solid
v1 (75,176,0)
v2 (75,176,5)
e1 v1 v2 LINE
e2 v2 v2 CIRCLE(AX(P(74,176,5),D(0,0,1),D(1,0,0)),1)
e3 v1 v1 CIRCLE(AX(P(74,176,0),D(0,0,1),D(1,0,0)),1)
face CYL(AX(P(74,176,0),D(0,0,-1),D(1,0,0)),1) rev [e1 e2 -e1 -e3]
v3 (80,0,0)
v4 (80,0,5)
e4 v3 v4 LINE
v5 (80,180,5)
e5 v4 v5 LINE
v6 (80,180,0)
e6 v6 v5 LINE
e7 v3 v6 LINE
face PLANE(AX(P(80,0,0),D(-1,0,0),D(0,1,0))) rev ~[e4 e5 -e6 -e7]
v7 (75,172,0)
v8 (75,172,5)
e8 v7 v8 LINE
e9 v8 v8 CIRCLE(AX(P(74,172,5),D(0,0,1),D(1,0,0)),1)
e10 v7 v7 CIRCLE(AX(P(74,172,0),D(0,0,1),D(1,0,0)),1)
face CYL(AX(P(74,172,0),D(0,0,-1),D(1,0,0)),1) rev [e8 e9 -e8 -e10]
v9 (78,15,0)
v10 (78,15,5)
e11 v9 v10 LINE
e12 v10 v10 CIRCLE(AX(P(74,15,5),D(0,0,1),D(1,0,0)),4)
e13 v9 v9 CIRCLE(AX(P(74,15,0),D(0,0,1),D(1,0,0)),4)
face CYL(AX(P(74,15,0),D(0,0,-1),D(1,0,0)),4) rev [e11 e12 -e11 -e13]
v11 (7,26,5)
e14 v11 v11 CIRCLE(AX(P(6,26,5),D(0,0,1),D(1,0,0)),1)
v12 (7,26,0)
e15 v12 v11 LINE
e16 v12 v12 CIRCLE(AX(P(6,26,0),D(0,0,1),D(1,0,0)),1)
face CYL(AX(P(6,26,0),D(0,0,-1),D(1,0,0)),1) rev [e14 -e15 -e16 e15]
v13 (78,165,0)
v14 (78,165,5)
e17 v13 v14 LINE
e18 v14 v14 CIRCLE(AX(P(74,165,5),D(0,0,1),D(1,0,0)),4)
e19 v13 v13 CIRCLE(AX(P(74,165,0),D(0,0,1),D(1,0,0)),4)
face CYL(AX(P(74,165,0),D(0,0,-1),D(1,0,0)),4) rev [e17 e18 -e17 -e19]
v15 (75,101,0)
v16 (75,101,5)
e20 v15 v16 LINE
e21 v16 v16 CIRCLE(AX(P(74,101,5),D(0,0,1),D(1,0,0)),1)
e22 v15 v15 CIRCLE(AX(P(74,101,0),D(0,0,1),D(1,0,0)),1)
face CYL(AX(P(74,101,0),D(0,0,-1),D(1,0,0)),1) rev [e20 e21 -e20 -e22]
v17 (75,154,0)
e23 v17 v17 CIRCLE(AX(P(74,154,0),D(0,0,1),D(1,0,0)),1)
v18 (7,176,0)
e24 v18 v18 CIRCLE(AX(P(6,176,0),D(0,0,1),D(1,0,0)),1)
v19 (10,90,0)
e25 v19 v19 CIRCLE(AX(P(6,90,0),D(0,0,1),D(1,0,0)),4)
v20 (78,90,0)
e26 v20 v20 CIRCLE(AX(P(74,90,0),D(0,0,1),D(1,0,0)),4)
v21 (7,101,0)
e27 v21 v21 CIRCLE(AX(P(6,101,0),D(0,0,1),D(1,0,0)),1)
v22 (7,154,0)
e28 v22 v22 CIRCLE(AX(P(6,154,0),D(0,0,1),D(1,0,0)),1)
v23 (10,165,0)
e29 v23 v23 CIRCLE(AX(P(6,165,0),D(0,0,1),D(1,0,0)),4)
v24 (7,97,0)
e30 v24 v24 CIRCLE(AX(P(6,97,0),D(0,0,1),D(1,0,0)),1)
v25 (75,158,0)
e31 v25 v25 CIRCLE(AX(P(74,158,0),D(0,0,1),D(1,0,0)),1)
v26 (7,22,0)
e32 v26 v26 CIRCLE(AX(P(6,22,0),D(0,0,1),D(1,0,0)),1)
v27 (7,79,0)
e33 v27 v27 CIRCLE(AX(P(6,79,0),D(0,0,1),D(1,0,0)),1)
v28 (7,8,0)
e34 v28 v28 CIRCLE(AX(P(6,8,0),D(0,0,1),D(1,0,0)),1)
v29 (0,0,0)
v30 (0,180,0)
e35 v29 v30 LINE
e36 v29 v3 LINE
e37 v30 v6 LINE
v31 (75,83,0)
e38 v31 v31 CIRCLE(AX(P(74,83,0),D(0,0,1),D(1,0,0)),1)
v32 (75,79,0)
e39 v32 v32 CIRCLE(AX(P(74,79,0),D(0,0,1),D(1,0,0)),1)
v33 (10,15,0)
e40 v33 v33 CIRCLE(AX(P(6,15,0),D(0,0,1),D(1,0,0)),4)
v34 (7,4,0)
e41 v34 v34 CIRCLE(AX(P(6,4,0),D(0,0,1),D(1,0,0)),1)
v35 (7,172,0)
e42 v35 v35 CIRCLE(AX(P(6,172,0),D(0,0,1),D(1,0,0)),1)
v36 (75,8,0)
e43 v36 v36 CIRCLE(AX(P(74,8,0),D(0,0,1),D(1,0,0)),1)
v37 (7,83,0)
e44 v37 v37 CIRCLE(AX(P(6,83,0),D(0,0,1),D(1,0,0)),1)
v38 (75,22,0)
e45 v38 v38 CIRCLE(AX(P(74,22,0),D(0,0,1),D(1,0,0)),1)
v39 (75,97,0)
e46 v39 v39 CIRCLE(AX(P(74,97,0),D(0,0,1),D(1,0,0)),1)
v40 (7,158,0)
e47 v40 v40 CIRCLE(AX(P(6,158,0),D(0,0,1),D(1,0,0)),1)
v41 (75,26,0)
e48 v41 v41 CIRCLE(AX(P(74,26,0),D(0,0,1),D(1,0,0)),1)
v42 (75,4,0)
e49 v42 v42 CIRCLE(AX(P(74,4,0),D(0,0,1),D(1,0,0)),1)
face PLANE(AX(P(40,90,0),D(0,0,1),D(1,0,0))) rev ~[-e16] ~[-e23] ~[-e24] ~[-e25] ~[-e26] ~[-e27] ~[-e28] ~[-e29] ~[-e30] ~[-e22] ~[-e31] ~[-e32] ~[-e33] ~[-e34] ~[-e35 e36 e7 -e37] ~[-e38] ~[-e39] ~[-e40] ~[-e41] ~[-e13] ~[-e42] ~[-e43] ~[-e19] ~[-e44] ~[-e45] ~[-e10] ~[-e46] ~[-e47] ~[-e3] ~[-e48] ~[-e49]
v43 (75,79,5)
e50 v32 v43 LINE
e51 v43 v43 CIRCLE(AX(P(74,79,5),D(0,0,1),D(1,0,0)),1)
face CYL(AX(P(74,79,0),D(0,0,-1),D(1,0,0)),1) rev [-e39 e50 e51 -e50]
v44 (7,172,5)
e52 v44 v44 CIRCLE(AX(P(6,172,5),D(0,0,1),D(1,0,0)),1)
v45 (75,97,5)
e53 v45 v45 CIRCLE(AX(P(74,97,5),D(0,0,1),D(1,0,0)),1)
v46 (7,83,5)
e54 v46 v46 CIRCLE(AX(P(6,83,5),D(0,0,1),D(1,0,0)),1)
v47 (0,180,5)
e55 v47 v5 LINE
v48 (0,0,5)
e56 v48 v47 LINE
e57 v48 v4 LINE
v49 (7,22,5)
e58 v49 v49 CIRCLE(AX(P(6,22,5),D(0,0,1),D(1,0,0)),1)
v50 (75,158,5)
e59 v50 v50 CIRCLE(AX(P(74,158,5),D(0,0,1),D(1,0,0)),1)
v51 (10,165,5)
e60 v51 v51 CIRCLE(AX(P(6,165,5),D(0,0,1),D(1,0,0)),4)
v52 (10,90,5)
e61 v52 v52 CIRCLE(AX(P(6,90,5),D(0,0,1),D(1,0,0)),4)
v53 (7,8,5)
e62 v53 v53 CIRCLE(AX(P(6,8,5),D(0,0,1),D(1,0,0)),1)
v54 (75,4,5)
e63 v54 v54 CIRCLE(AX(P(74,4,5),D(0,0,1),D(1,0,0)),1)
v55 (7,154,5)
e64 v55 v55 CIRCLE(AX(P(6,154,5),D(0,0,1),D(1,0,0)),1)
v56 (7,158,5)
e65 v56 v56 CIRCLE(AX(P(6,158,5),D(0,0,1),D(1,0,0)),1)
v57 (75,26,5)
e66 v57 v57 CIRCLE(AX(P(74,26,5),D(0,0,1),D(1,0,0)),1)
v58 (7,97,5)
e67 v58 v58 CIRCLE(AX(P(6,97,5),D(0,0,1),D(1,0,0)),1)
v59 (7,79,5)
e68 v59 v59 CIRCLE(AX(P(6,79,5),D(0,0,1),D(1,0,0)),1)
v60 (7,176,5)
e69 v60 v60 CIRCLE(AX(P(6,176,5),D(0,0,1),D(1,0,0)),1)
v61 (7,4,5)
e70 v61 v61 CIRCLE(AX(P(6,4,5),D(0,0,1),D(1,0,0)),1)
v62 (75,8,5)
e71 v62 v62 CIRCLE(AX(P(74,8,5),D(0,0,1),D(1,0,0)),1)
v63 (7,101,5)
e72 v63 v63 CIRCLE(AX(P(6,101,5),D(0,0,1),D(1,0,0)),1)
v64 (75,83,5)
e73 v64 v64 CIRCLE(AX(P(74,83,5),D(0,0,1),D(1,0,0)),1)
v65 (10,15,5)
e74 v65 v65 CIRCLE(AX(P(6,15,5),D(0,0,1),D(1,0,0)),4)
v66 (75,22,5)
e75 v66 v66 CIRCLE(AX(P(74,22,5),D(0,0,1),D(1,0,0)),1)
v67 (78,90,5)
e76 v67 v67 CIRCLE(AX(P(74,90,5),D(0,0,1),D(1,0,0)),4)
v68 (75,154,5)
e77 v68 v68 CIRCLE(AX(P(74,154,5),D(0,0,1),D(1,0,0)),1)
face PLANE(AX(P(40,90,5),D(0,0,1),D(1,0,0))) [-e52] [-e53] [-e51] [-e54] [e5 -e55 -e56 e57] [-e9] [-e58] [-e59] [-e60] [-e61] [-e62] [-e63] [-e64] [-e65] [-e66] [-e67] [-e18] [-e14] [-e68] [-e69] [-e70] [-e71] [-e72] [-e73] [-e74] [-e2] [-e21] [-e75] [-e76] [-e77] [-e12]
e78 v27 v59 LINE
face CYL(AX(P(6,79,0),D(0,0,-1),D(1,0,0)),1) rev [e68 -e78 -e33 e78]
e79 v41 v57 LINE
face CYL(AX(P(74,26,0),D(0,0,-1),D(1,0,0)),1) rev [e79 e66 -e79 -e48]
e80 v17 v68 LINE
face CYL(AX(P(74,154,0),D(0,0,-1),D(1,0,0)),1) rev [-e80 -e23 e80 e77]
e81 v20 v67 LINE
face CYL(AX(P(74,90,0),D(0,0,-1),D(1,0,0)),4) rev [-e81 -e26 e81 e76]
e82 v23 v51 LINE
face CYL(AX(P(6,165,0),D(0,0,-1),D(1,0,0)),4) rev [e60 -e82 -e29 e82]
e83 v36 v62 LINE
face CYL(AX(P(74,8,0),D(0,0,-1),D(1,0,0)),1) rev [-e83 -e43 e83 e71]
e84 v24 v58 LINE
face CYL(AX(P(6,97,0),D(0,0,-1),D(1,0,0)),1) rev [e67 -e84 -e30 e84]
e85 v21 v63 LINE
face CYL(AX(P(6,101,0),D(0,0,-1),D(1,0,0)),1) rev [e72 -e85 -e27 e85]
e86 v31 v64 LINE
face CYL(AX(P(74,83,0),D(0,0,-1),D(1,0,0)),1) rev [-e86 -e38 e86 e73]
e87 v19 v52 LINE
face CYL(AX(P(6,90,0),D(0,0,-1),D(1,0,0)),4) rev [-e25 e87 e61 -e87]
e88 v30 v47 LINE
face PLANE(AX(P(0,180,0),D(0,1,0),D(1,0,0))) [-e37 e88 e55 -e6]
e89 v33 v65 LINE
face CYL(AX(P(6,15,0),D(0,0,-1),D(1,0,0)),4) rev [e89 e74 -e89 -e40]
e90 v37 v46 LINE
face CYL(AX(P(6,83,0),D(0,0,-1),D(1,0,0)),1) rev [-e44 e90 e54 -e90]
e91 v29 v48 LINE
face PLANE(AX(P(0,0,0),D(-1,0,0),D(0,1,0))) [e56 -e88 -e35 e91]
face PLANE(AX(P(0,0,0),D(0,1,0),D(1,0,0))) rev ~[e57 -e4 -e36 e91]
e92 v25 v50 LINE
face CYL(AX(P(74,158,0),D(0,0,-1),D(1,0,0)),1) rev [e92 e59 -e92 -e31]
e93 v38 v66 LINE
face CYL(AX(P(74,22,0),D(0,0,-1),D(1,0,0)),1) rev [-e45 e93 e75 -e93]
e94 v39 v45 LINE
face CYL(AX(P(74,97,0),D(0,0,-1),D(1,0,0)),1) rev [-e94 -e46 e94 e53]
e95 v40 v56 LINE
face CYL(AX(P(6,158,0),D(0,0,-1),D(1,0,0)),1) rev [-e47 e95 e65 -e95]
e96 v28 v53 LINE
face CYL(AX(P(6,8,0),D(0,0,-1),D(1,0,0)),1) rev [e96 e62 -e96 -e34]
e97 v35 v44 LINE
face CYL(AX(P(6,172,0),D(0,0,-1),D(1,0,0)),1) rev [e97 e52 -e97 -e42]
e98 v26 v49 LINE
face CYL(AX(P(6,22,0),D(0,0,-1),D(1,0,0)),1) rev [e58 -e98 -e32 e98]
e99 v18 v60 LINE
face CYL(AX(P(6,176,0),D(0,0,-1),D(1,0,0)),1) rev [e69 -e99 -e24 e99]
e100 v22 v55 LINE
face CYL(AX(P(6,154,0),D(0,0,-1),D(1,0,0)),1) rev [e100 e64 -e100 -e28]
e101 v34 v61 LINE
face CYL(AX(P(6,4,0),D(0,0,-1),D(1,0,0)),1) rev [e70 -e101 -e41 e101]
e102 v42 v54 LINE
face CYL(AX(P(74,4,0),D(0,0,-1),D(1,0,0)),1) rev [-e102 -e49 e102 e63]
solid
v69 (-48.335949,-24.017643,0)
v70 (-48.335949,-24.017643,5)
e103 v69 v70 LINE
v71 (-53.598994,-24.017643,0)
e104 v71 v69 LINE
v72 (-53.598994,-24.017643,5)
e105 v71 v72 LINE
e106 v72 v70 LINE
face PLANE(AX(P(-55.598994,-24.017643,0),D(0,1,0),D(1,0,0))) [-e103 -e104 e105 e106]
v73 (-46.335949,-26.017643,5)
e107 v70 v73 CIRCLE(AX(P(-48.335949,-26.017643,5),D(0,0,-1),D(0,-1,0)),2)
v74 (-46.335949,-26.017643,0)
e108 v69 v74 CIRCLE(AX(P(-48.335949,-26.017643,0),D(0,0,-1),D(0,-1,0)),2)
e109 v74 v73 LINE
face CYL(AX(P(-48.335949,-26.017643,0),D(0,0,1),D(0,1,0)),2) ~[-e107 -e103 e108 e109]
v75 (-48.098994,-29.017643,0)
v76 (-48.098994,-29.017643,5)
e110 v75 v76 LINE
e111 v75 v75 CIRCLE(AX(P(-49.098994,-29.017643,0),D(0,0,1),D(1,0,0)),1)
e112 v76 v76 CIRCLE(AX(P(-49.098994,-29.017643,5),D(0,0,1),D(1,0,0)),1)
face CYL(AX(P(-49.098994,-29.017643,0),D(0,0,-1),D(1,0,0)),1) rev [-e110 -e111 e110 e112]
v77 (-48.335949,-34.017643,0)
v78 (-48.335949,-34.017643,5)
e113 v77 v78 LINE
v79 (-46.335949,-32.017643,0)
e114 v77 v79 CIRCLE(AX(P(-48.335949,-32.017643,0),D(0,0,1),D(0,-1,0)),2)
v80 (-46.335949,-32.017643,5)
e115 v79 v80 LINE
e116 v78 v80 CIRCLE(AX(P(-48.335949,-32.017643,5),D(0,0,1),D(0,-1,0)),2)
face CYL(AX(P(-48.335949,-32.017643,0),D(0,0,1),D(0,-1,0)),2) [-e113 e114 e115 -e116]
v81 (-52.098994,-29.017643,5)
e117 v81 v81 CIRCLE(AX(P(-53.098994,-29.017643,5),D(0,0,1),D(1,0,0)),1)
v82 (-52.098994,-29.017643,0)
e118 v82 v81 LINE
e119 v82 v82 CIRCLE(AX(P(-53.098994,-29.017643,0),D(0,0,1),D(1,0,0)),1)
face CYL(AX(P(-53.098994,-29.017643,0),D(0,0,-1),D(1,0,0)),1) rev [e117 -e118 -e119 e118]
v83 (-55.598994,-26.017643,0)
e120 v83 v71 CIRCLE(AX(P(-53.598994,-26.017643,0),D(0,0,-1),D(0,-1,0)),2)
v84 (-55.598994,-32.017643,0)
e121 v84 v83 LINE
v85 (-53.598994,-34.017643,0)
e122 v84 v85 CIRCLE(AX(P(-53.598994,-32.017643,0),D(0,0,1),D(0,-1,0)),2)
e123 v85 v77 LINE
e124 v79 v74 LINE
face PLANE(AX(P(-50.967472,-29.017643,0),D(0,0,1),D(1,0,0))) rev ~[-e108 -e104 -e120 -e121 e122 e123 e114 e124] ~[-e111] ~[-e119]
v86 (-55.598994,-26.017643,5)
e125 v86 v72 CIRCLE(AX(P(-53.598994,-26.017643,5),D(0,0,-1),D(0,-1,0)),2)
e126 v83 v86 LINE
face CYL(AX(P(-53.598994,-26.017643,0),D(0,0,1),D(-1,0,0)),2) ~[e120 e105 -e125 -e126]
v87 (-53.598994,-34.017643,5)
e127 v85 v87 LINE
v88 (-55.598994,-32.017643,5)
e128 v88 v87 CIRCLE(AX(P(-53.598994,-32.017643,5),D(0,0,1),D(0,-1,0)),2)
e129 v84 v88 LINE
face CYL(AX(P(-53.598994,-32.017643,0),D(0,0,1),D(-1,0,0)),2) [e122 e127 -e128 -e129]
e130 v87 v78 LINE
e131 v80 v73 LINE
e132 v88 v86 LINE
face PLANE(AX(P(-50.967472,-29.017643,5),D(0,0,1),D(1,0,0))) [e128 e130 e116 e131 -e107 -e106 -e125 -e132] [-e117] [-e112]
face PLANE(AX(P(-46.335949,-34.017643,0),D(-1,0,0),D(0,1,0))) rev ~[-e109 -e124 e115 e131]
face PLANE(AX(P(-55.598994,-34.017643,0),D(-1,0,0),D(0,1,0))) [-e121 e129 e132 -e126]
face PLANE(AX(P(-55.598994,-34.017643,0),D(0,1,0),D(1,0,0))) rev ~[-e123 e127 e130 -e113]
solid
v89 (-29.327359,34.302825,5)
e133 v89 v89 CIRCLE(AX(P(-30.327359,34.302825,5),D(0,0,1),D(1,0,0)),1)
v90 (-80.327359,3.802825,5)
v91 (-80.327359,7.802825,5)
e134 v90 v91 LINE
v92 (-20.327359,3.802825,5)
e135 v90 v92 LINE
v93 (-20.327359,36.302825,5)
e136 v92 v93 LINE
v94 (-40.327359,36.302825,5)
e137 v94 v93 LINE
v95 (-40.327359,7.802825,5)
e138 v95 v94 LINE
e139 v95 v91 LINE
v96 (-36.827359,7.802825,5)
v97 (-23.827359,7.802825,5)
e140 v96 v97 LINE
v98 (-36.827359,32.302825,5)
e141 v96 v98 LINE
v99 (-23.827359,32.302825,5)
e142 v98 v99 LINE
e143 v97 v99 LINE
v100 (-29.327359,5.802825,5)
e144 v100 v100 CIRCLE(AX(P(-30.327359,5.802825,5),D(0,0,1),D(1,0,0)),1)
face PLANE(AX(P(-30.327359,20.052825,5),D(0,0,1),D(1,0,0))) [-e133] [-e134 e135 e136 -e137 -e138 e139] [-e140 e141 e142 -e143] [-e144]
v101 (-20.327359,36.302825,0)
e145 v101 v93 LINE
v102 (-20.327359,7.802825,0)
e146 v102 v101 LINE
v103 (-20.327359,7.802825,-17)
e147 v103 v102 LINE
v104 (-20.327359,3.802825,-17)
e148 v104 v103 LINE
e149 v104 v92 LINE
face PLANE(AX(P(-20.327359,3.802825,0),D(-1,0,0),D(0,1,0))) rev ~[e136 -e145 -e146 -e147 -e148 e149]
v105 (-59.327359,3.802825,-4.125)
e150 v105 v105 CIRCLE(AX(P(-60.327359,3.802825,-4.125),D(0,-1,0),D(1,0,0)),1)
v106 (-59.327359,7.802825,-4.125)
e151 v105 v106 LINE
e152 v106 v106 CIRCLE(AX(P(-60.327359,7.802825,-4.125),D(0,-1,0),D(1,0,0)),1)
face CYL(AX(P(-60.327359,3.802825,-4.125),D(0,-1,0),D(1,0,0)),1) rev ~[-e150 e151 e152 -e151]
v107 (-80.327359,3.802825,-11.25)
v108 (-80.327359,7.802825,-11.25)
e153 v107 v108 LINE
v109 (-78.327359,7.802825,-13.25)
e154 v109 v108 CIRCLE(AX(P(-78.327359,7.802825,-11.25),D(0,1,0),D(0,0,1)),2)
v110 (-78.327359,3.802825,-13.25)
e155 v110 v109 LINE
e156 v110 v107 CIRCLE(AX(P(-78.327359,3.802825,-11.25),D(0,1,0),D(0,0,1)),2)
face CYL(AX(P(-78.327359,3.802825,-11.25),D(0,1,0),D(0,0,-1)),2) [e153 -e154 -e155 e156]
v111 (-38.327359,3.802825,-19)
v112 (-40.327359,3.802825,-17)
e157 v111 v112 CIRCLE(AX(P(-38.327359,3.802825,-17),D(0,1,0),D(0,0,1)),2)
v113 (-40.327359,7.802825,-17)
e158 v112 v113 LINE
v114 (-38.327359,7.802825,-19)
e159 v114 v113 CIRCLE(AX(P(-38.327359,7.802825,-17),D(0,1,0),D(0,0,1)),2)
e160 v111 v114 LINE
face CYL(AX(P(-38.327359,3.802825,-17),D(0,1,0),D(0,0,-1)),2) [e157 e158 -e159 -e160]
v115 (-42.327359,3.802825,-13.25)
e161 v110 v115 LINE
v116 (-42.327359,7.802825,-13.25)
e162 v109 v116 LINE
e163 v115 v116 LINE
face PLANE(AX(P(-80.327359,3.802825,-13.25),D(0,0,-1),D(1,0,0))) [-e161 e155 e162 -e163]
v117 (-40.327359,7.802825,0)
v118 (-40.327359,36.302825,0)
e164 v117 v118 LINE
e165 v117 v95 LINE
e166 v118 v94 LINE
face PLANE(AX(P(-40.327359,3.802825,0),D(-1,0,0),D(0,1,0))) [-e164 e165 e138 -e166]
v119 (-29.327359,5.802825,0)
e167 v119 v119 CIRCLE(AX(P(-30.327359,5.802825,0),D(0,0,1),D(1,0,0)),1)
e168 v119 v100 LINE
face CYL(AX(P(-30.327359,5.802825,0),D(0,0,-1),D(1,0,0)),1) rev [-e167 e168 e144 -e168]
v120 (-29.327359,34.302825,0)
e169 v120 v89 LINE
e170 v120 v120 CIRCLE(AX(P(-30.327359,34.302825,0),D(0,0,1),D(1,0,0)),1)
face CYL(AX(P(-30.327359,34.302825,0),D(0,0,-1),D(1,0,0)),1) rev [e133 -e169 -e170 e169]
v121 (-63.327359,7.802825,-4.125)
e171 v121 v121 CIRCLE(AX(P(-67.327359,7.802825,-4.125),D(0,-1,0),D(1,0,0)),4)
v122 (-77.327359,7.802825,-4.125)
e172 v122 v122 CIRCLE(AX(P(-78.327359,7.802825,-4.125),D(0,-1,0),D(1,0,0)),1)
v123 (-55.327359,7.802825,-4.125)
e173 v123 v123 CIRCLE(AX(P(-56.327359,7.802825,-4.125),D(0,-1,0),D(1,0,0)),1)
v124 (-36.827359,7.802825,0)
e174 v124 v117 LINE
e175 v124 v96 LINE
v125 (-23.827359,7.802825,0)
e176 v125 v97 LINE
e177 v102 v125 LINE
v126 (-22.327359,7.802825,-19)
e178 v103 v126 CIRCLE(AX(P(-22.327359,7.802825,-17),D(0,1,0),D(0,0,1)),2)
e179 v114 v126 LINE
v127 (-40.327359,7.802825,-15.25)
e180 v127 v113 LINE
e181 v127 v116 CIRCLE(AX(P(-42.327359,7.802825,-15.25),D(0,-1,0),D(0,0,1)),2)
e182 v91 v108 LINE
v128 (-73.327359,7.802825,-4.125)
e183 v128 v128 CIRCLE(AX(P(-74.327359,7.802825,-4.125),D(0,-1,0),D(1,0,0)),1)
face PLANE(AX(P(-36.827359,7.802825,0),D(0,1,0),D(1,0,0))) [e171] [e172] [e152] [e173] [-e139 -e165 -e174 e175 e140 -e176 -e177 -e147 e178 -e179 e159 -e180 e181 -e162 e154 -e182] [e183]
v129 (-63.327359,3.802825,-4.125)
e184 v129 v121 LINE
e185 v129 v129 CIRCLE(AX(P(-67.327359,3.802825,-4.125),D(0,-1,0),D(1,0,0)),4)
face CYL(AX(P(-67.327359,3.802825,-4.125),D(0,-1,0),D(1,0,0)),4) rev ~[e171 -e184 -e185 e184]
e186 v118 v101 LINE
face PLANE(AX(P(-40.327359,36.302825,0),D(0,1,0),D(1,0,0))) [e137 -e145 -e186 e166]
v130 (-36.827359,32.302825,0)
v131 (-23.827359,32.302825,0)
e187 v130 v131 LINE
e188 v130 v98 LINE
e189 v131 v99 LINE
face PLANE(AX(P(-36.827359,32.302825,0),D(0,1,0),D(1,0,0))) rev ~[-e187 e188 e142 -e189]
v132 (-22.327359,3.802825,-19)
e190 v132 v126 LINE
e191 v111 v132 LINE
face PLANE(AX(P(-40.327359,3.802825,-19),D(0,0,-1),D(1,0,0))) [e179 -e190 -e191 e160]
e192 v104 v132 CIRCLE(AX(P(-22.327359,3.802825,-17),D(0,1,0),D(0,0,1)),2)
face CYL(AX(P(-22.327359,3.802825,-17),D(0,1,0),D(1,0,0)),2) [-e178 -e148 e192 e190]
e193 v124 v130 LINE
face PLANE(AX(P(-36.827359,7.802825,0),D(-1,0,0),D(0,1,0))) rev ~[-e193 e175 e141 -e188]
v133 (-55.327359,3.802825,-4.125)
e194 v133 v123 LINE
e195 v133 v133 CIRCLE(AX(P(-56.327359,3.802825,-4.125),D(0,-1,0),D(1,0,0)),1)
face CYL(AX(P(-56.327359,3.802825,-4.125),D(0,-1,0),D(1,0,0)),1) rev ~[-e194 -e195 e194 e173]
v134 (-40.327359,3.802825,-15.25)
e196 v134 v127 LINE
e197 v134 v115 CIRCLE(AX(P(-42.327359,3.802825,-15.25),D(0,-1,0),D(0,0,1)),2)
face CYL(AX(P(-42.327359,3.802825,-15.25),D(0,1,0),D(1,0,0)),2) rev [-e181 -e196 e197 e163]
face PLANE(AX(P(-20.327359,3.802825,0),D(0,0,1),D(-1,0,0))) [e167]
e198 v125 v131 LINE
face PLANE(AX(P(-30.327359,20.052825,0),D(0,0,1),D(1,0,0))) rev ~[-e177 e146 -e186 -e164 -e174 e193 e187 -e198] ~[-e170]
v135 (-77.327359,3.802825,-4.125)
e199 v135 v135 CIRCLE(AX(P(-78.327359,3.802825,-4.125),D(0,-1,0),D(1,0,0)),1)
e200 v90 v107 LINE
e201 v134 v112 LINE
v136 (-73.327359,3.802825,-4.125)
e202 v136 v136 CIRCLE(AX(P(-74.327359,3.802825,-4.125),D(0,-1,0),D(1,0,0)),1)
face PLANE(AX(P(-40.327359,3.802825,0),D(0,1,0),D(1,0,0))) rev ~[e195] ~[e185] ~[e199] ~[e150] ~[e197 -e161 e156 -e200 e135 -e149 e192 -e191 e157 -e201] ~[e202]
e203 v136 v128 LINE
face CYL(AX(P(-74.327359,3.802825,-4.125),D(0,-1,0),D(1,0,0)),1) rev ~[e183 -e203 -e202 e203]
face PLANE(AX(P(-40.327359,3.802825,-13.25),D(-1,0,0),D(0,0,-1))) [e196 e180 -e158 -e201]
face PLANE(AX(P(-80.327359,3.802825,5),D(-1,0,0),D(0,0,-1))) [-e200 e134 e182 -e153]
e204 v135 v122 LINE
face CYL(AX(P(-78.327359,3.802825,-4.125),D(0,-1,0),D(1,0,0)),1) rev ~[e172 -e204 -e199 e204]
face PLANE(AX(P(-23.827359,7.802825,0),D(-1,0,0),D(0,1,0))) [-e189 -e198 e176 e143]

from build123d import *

# Parameters (mm, degrees)
F0_W     = 20
F0_H     = 32.5
F0_R     = 1
F0_W_2   = 13
F0_H_2   = 24.5
F1_DEPTH = 5
F2_R     = 1
F2_R_2   = 4
F3_DEPTH = 4
F4_R     = 2
F5_W     = 9.2630446101
F5_H     = 10
F5_R     = 1
F6_DEPTH = 5
F7_R     = 2
F8_W     = 80
F8_H     = 180
F8_R     = 1
F8_R_2   = 4
F9_DEPTH = 5


with BuildPart() as f1:
    # F0 (on Top) → F1 (new body)
    with BuildSketch(Plane.XY):
        with Locations((-30.3273589909, 20.0528247654)):
            Rectangle(F0_W, F0_H)
        with Locations((-30.3273589909, 5.8028247654)):
            Circle(F0_R, mode=Mode.SUBTRACT)
        with Locations((-30.3273589909, 20.0528247654)):
            Rectangle(F0_W_2, F0_H_2, mode=Mode.SUBTRACT)
        with Locations((-30.3273589909, 34.3028247654)):
            Circle(F0_R, mode=Mode.SUBTRACT)
    extrude(amount=F1_DEPTH)

    # F2 (on face) → F3 (join)
    with BuildSketch(Plane.XZ.offset(-3.8028247654)):
        Polygon((-20.3273589909, 0), (-40.3273589909, 0), (-40.3273589909, 5), (-80.3273589909, 5), (-80.3273589909, -13.25), (-40.3273589909, -13.25), (-40.3273589909, -19), (-20.3273589909, -19), align=None)
        with Locations((-78.3273589909, -4.125)):
            Circle(F2_R, mode=Mode.SUBTRACT)
        with Locations((-74.3273589909, -4.125)):
            Circle(F2_R, mode=Mode.SUBTRACT)
        with Locations((-67.3273589909, -4.125)):
            Circle(F2_R_2, mode=Mode.SUBTRACT)
        with Locations((-60.3273589909, -4.125)):
            Circle(F2_R, mode=Mode.SUBTRACT)
        with Locations((-56.3273589909, -4.125)):
            Circle(F2_R, mode=Mode.SUBTRACT)
    extrude(amount=-F3_DEPTH)

    # F4
    f4_edges = [f1.edges().sort_by_distance(p)[0] for p in [
        (-40.327359, 5.802825, -13.25),
        (-40.327359, 5.802825, -19),
        (-20.327359, 5.802825, -19),
        (-80.327359, 5.802825, -13.25),
    ]]
    fillet(f4_edges, radius=F4_R)


with BuildPart() as f6:
    # F5 (on Top) → F6 (new body)
    with BuildSketch(Plane.XY):
        with Locations((-50.9674716741, -29.0176426284)):
            Rectangle(F5_W, F5_H)
        with Locations((-53.0989939792, -29.0176426284)):
            Circle(F5_R, mode=Mode.SUBTRACT)
        with Locations((-49.0989939792, -29.0176426284)):
            Circle(F5_R, mode=Mode.SUBTRACT)
    extrude(amount=F6_DEPTH)

    # F7
    f7_edges = [f6.edges().sort_by_distance(p)[0] for p in [
        (-55.598994, -24.017643, 2.5),
        (-46.335949, -24.017643, 2.5),
        (-55.598994, -34.017643, 2.5),
        (-46.335949, -34.017643, 2.5),
    ]]
    fillet(f7_edges, radius=F7_R)


with BuildPart() as f9:
    # F8 (on Top) → F9 (new body)
    with BuildSketch(Plane.XY):
        with Locations((40, 90)):
            Rectangle(F8_W, F8_H)
        with Locations((6, 4)):
            Circle(F8_R, mode=Mode.SUBTRACT)
        with Locations((6, 8)):
            Circle(F8_R, mode=Mode.SUBTRACT)
        with Locations((6, 15)):
            Circle(F8_R_2, mode=Mode.SUBTRACT)
        with Locations((6, 22)):
            Circle(F8_R, mode=Mode.SUBTRACT)
        with Locations((6, 26)):
            Circle(F8_R, mode=Mode.SUBTRACT)
        with Locations((6, 79)):
            Circle(F8_R, mode=Mode.SUBTRACT)
        with Locations((6, 83)):
            Circle(F8_R, mode=Mode.SUBTRACT)
        with Locations((74, 4)):
            Circle(F8_R, mode=Mode.SUBTRACT)
        with Locations((74, 8)):
            Circle(F8_R, mode=Mode.SUBTRACT)
        with Locations((74, 15)):
            Circle(F8_R_2, mode=Mode.SUBTRACT)
        with Locations((74, 22)):
            Circle(F8_R, mode=Mode.SUBTRACT)
        with Locations((74, 26)):
            Circle(F8_R, mode=Mode.SUBTRACT)
        with Locations((74, 79)):
            Circle(F8_R, mode=Mode.SUBTRACT)
        with Locations((74, 83)):
            Circle(F8_R, mode=Mode.SUBTRACT)
        with Locations((6, 90)):
            Circle(F8_R_2, mode=Mode.SUBTRACT)
        with Locations((6, 97)):
            Circle(F8_R, mode=Mode.SUBTRACT)
        with Locations((6, 101)):
            Circle(F8_R, mode=Mode.SUBTRACT)
        with Locations((6, 154)):
            Circle(F8_R, mode=Mode.SUBTRACT)
        with Locations((6, 158)):
            Circle(F8_R, mode=Mode.SUBTRACT)
        with Locations((6, 165)):
            Circle(F8_R_2, mode=Mode.SUBTRACT)
        with Locations((6, 172)):
            Circle(F8_R, mode=Mode.SUBTRACT)
        with Locations((6, 176)):
            Circle(F8_R, mode=Mode.SUBTRACT)
        with Locations((74, 90)):
            Circle(F8_R_2, mode=Mode.SUBTRACT)
        with Locations((74, 97)):
            Circle(F8_R, mode=Mode.SUBTRACT)
        with Locations((74, 101)):
            Circle(F8_R, mode=Mode.SUBTRACT)
        with Locations((74, 154)):
            Circle(F8_R, mode=Mode.SUBTRACT)
        with Locations((74, 158)):
            Circle(F8_R, mode=Mode.SUBTRACT)
        with Locations((74, 165)):
            Circle(F8_R_2, mode=Mode.SUBTRACT)
        with Locations((74, 172)):
            Circle(F8_R, mode=Mode.SUBTRACT)
        with Locations((74, 176)):
            Circle(F8_R, mode=Mode.SUBTRACT)
    extrude(amount=F9_DEPTH)


solid = Compound([f1.part, f6.part, f9.part])
